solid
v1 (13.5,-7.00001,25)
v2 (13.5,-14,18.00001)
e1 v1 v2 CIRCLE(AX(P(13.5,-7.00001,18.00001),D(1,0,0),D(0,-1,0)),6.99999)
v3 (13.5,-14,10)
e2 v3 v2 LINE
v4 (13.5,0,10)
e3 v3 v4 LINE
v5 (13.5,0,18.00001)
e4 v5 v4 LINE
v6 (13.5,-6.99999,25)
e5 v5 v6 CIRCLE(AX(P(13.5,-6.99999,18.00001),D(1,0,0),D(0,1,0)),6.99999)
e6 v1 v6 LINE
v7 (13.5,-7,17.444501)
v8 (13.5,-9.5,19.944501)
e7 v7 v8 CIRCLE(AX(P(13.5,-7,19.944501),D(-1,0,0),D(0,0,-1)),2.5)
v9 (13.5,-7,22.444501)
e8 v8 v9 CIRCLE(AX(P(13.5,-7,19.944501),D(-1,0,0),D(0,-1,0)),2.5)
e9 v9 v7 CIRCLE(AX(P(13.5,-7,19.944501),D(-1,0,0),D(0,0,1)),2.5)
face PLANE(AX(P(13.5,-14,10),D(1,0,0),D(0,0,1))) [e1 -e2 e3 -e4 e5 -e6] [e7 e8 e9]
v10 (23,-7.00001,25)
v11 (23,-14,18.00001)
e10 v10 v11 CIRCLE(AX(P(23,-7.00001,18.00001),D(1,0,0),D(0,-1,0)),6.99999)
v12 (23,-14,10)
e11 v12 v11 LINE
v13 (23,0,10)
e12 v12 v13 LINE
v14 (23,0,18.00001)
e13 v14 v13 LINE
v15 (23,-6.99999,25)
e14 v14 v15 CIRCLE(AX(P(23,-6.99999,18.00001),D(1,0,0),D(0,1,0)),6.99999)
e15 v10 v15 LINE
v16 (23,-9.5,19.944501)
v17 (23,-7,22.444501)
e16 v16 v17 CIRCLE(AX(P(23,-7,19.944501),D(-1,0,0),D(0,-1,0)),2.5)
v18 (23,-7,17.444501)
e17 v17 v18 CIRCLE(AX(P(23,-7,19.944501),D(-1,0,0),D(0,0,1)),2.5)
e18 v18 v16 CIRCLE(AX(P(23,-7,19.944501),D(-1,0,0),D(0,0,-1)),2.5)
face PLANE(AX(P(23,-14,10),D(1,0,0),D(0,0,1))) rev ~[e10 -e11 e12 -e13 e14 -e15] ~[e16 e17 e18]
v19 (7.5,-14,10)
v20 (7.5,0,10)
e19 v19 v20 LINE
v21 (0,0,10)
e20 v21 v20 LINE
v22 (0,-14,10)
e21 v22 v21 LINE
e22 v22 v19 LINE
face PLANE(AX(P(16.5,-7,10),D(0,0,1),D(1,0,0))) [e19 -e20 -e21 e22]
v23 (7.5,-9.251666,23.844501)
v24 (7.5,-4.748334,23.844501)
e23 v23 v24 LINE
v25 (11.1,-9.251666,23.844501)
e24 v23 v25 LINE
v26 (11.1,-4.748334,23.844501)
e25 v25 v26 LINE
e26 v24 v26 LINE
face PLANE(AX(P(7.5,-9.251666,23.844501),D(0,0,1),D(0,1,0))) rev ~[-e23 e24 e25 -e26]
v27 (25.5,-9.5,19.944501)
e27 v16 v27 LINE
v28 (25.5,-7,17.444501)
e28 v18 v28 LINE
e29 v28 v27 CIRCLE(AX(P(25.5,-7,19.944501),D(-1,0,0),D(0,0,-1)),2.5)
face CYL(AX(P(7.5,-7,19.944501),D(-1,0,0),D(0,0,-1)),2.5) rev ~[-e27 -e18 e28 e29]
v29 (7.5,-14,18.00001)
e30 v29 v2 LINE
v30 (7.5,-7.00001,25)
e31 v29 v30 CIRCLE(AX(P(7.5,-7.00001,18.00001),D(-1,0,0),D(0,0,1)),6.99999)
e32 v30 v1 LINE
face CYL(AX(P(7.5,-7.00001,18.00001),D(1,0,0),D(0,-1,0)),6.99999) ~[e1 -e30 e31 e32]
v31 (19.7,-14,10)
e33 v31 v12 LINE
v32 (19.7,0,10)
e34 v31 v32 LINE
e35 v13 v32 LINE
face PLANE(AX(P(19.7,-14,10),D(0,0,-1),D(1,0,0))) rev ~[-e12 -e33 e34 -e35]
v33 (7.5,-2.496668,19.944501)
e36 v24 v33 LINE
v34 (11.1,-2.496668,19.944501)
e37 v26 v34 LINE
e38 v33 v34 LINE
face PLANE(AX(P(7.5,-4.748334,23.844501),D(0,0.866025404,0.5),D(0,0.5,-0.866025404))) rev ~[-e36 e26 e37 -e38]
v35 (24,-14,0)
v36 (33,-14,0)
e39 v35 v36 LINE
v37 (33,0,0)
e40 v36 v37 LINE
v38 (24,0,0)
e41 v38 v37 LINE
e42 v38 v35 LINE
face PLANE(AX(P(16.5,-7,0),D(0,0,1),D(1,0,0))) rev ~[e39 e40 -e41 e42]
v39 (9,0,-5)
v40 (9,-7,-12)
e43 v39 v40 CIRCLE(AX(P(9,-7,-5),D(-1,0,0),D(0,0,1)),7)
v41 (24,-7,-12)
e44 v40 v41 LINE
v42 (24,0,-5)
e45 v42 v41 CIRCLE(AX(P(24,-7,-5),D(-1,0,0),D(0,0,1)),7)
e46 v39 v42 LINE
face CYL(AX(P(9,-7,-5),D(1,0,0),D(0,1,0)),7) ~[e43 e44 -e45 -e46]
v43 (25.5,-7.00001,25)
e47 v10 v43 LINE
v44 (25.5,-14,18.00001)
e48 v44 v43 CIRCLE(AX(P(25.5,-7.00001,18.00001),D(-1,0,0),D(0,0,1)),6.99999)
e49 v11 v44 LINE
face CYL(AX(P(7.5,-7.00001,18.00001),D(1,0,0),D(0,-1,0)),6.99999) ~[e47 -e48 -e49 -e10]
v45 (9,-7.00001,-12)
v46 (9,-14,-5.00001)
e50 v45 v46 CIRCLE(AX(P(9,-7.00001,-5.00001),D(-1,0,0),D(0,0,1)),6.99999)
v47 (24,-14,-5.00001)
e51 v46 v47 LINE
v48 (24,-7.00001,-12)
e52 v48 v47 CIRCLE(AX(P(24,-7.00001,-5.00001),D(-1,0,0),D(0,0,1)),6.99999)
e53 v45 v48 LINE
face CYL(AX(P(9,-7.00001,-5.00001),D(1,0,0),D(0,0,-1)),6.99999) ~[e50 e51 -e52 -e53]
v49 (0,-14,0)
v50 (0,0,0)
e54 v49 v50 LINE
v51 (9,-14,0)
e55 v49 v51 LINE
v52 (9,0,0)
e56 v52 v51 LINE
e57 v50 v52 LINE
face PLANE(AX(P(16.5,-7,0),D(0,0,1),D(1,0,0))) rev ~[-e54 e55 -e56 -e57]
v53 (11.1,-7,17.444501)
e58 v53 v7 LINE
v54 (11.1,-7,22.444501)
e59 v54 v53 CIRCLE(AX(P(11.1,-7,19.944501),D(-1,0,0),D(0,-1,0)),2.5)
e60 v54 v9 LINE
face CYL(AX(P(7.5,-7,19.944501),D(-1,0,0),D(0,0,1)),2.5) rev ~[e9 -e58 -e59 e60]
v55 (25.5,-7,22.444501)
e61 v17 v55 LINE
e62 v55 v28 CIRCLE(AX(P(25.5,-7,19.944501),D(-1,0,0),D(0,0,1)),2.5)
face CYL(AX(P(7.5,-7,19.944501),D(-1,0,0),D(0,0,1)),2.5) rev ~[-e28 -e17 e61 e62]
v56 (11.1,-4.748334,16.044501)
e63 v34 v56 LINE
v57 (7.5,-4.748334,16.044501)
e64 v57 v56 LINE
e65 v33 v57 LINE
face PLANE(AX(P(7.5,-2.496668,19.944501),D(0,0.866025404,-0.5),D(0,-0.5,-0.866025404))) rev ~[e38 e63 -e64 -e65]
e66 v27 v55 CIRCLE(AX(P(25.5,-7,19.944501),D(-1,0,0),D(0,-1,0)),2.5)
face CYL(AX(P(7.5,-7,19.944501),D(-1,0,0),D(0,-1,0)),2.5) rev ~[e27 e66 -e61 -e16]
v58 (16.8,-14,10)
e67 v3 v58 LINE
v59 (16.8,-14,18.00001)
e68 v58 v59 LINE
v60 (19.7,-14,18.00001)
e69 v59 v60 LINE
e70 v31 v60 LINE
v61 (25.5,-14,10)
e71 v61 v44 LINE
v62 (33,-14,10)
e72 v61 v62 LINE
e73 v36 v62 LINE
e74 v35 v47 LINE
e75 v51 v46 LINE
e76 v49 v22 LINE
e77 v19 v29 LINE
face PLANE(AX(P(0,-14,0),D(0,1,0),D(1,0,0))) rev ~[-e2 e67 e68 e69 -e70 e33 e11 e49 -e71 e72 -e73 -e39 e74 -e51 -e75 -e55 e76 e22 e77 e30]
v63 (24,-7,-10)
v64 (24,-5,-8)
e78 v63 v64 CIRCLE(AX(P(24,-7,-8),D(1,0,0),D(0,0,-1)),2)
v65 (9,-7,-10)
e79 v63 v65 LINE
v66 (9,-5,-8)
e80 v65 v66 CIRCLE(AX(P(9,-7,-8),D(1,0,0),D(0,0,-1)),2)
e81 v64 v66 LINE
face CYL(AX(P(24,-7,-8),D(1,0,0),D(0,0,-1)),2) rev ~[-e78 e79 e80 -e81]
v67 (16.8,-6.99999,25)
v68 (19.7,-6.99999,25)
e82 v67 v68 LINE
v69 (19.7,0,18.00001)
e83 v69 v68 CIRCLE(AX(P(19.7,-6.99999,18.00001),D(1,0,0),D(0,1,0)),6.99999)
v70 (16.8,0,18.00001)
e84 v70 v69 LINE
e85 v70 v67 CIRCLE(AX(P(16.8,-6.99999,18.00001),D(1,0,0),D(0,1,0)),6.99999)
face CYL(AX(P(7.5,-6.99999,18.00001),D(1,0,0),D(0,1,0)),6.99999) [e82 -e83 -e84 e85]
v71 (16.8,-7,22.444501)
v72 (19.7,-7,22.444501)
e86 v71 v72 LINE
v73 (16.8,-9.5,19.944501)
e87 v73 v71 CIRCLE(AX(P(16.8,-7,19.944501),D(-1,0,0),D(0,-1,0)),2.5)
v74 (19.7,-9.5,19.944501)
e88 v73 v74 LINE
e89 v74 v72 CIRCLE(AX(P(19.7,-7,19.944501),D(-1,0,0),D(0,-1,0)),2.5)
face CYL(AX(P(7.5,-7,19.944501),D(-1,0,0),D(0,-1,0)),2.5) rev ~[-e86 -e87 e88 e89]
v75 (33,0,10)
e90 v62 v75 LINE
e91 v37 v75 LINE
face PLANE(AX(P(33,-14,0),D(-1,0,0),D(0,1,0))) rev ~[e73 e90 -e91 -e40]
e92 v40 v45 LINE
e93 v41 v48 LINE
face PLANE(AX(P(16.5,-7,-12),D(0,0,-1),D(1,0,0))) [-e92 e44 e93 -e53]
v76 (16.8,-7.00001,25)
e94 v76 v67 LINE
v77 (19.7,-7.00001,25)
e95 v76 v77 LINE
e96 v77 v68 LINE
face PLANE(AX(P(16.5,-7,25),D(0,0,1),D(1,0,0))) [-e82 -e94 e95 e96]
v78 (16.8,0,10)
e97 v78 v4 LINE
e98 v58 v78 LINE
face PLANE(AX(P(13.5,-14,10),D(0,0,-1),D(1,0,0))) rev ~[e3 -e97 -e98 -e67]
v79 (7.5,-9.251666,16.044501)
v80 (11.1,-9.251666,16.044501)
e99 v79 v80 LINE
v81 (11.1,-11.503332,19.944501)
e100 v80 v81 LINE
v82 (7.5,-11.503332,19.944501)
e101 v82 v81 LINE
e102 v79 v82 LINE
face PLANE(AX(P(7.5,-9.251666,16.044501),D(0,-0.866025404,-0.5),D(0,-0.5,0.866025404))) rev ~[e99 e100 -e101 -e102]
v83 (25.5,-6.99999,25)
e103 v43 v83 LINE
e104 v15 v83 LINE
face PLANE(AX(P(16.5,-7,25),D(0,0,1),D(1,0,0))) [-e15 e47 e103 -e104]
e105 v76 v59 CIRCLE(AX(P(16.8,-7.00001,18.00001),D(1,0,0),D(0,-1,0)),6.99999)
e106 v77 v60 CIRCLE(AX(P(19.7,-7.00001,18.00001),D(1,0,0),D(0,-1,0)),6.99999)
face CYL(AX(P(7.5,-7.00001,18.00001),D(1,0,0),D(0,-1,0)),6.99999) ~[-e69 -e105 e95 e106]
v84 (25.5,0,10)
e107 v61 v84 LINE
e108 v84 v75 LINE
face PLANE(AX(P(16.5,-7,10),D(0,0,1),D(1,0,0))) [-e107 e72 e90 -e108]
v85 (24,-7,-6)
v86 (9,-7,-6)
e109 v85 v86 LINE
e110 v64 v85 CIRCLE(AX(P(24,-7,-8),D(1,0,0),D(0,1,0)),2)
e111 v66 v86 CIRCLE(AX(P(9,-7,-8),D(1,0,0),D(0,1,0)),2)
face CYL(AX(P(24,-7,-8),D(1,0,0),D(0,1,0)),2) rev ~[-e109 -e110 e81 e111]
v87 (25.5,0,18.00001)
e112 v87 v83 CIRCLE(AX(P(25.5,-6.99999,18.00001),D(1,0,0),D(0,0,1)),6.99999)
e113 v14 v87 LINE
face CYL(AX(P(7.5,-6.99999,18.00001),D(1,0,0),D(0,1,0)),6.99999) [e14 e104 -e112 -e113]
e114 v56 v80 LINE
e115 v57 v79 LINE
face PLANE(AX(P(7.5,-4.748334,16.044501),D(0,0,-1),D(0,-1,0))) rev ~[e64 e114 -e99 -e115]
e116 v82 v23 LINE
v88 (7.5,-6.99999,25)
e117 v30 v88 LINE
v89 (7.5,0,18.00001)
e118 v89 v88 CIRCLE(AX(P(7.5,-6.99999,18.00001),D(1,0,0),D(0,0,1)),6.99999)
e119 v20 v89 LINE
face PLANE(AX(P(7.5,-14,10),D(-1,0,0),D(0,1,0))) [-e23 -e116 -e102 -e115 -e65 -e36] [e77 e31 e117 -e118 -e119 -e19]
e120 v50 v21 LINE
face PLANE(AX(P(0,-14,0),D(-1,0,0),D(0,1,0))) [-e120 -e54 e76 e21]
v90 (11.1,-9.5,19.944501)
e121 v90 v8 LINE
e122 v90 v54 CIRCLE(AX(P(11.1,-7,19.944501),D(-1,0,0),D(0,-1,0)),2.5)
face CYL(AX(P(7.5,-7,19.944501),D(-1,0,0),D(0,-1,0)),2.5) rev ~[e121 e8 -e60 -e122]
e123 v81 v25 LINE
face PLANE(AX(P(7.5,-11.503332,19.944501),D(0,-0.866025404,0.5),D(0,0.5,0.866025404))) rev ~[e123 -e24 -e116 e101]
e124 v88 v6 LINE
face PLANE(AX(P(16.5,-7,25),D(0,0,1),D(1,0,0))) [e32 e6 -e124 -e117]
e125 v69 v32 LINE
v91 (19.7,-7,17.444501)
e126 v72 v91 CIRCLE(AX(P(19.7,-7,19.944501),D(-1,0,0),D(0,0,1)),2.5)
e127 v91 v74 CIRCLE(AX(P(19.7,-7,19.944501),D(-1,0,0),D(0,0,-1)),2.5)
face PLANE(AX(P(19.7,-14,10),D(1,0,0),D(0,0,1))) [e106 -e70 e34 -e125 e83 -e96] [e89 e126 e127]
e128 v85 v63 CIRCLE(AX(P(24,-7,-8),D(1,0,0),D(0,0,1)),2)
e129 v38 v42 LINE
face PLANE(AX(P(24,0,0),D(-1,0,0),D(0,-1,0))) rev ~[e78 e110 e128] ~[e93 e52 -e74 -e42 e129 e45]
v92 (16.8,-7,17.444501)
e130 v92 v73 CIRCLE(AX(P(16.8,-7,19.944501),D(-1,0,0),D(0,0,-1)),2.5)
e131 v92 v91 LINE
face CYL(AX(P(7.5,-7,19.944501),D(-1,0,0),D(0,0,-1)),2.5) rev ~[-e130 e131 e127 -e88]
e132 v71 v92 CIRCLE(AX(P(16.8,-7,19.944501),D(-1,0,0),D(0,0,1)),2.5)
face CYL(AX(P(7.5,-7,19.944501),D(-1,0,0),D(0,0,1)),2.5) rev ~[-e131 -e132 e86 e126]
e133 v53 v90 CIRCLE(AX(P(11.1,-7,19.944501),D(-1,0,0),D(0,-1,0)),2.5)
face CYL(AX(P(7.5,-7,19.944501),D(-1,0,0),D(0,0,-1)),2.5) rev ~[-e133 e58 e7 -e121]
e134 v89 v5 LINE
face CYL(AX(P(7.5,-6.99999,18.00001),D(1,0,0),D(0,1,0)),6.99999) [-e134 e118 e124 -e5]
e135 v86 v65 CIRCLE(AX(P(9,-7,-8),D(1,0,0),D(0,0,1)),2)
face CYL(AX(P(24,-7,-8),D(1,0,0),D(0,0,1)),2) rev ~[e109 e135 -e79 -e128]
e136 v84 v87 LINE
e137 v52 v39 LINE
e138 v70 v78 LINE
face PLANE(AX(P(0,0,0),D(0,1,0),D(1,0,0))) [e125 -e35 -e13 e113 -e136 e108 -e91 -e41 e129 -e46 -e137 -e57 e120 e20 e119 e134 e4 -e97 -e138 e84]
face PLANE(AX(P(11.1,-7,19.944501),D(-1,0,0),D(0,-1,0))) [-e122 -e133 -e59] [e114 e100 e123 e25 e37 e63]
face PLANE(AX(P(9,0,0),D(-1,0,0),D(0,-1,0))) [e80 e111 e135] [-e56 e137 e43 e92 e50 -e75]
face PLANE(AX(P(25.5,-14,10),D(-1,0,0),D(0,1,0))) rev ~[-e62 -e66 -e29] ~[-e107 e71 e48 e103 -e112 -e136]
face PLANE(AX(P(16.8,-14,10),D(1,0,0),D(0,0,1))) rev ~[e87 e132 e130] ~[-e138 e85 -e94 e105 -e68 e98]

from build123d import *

# Parameters (mm, degrees)
F0_W      = 33
F0_H      = 14
F1_DEPTH  = 10
F2_W      = 15
F2_H      = 14
F3_DEPTH  = 12
F4_R      = 7
F5_R      = 6.99999
F7_DEPTH  = 24.001
F8_W      = 18
F8_H      = 14
F9_DEPTH  = 15
F11_DEPTH = 25
F13_R     = 6.99999
F12_W     = 3.3
F12_H     = 15
F14_DEPTH = 25
F15_R     = 2.5
F16_DEPTH = 3.6


# Not quite as in the source:
# - a fillet or chamfer is up to 0.001 mm smaller than in the source, because OpenCascade refuses the exact size


with BuildPart() as f1:
    # F0 (on Top) → F1 (new body)
    with BuildSketch(Plane.XY):
        with Locations((16.5, -7)):
            Rectangle(F0_W, F0_H)
    extrude(amount=F1_DEPTH)

    # F2 (on face) → F3 (join)
    with BuildSketch(Plane(origin=(0, 0, 0), x_dir=(1, 0, 0), z_dir=(0, 0, -1))):
        with Locations((16.5, 7)):
            Rectangle(F2_W, F2_H)
    extrude(amount=F3_DEPTH)

    # F4
    f4_edges = [f1.edges().sort_by_distance(p)[0] for p in [
        (16.5, 0, -12),
    ]]
    fillet(f4_edges, radius=F4_R)

    # F5 (radius 7 in the source; OpenCascade refuses exactly that, so slightly less here)
    f5_edges = [f1.edges().sort_by_distance(p)[0] for p in [
        (16.5, -14, -12),
    ]]
    fillet(f5_edges, radius=F5_R)

    # F6 (on face) → F7 (cut, through all)
    with BuildSketch(Plane.YZ.offset(24)):
        with BuildLine():
            Line((-7, -10), (-7, -6))
            ThreePointArc((-7, -6), (-9, -8), (-7, -10))
        make_face()
        with BuildLine():
            ThreePointArc((-7, -10), (-5.5857864376, -9.4142135624), (-5, -8))
            ThreePointArc((-5, -8), (-5.5857864376, -6.5857864376), (-7, -6))
            Line((-7, -6), (-7, -10))
        make_face()
    extrude(amount=-F7_DEPTH, mode=Mode.SUBTRACT)

    # F8 (on face) → F9 (join)
    with BuildSketch(Plane.XY.offset(10)):
        with Locations((16.5, -7)):
            Rectangle(F8_W, F8_H)
    extrude(amount=F9_DEPTH)

    # F10 (on face) → F11 (cut)
    with BuildSketch(Plane(origin=(7.5, 0, 0), x_dir=(0, -1, 0), z_dir=(-1, 0, 0))):
        with BuildLine():
            Line((7, 22.4445006251), (7, 17.4445006251))
            ThreePointArc((7, 17.4445006251), (8.767766953, 18.1767336722), (9.5, 19.9445006251))
            ThreePointArc((9.5, 19.9445006251), (8.767766953, 21.7122675781), (7, 22.4445006251))
        make_face()
        with BuildLine():
            ThreePointArc((7, 22.4445006251), (4.5, 19.9445006251), (7, 17.4445006251))
            Line((7, 17.4445006251), (7, 22.4445006251))
        make_face()
    extrude(amount=-F11_DEPTH, mode=Mode.SUBTRACT)

    # F13 (radius 7 in the source; OpenCascade refuses exactly that, so slightly less here)
    f13_edges = [f1.edges().sort_by_distance(p)[0] for p in [
        (16.5, -14, 25),
        (16.5, 0, 25),
    ]]
    fillet(f13_edges, radius=F13_R)

    # F12 (on face) → F14 (cut)
    with BuildSketch(Plane.XZ.offset(14)):
        with Locations((21.35, 17.5)):
            Rectangle(F12_W, F12_H)
        with Locations((15.15, 17.5)):
            Rectangle(F12_W, F12_H)
    extrude(amount=-F14_DEPTH, mode=Mode.SUBTRACT)

    # F15 (on face) → F16 (cut)
    with BuildSketch(Plane(origin=(7.5, 0, 0), x_dir=(0, -1, 0), z_dir=(-1, 0, 0))):
        Polygon((4.7483339502, 16.0445006251), (9.2516660498, 16.0445006251), (11.5033320997, 19.9445006251), (9.2516660498, 23.8445006251), (4.7483339502, 23.8445006251), (2.4966679003, 19.9445006251), align=None)
        with Locations((7, 19.9445006251)):
            Circle(F15_R, mode=Mode.SUBTRACT)
    extrude(amount=-F16_DEPTH, mode=Mode.SUBTRACT)


solid = f1.part
